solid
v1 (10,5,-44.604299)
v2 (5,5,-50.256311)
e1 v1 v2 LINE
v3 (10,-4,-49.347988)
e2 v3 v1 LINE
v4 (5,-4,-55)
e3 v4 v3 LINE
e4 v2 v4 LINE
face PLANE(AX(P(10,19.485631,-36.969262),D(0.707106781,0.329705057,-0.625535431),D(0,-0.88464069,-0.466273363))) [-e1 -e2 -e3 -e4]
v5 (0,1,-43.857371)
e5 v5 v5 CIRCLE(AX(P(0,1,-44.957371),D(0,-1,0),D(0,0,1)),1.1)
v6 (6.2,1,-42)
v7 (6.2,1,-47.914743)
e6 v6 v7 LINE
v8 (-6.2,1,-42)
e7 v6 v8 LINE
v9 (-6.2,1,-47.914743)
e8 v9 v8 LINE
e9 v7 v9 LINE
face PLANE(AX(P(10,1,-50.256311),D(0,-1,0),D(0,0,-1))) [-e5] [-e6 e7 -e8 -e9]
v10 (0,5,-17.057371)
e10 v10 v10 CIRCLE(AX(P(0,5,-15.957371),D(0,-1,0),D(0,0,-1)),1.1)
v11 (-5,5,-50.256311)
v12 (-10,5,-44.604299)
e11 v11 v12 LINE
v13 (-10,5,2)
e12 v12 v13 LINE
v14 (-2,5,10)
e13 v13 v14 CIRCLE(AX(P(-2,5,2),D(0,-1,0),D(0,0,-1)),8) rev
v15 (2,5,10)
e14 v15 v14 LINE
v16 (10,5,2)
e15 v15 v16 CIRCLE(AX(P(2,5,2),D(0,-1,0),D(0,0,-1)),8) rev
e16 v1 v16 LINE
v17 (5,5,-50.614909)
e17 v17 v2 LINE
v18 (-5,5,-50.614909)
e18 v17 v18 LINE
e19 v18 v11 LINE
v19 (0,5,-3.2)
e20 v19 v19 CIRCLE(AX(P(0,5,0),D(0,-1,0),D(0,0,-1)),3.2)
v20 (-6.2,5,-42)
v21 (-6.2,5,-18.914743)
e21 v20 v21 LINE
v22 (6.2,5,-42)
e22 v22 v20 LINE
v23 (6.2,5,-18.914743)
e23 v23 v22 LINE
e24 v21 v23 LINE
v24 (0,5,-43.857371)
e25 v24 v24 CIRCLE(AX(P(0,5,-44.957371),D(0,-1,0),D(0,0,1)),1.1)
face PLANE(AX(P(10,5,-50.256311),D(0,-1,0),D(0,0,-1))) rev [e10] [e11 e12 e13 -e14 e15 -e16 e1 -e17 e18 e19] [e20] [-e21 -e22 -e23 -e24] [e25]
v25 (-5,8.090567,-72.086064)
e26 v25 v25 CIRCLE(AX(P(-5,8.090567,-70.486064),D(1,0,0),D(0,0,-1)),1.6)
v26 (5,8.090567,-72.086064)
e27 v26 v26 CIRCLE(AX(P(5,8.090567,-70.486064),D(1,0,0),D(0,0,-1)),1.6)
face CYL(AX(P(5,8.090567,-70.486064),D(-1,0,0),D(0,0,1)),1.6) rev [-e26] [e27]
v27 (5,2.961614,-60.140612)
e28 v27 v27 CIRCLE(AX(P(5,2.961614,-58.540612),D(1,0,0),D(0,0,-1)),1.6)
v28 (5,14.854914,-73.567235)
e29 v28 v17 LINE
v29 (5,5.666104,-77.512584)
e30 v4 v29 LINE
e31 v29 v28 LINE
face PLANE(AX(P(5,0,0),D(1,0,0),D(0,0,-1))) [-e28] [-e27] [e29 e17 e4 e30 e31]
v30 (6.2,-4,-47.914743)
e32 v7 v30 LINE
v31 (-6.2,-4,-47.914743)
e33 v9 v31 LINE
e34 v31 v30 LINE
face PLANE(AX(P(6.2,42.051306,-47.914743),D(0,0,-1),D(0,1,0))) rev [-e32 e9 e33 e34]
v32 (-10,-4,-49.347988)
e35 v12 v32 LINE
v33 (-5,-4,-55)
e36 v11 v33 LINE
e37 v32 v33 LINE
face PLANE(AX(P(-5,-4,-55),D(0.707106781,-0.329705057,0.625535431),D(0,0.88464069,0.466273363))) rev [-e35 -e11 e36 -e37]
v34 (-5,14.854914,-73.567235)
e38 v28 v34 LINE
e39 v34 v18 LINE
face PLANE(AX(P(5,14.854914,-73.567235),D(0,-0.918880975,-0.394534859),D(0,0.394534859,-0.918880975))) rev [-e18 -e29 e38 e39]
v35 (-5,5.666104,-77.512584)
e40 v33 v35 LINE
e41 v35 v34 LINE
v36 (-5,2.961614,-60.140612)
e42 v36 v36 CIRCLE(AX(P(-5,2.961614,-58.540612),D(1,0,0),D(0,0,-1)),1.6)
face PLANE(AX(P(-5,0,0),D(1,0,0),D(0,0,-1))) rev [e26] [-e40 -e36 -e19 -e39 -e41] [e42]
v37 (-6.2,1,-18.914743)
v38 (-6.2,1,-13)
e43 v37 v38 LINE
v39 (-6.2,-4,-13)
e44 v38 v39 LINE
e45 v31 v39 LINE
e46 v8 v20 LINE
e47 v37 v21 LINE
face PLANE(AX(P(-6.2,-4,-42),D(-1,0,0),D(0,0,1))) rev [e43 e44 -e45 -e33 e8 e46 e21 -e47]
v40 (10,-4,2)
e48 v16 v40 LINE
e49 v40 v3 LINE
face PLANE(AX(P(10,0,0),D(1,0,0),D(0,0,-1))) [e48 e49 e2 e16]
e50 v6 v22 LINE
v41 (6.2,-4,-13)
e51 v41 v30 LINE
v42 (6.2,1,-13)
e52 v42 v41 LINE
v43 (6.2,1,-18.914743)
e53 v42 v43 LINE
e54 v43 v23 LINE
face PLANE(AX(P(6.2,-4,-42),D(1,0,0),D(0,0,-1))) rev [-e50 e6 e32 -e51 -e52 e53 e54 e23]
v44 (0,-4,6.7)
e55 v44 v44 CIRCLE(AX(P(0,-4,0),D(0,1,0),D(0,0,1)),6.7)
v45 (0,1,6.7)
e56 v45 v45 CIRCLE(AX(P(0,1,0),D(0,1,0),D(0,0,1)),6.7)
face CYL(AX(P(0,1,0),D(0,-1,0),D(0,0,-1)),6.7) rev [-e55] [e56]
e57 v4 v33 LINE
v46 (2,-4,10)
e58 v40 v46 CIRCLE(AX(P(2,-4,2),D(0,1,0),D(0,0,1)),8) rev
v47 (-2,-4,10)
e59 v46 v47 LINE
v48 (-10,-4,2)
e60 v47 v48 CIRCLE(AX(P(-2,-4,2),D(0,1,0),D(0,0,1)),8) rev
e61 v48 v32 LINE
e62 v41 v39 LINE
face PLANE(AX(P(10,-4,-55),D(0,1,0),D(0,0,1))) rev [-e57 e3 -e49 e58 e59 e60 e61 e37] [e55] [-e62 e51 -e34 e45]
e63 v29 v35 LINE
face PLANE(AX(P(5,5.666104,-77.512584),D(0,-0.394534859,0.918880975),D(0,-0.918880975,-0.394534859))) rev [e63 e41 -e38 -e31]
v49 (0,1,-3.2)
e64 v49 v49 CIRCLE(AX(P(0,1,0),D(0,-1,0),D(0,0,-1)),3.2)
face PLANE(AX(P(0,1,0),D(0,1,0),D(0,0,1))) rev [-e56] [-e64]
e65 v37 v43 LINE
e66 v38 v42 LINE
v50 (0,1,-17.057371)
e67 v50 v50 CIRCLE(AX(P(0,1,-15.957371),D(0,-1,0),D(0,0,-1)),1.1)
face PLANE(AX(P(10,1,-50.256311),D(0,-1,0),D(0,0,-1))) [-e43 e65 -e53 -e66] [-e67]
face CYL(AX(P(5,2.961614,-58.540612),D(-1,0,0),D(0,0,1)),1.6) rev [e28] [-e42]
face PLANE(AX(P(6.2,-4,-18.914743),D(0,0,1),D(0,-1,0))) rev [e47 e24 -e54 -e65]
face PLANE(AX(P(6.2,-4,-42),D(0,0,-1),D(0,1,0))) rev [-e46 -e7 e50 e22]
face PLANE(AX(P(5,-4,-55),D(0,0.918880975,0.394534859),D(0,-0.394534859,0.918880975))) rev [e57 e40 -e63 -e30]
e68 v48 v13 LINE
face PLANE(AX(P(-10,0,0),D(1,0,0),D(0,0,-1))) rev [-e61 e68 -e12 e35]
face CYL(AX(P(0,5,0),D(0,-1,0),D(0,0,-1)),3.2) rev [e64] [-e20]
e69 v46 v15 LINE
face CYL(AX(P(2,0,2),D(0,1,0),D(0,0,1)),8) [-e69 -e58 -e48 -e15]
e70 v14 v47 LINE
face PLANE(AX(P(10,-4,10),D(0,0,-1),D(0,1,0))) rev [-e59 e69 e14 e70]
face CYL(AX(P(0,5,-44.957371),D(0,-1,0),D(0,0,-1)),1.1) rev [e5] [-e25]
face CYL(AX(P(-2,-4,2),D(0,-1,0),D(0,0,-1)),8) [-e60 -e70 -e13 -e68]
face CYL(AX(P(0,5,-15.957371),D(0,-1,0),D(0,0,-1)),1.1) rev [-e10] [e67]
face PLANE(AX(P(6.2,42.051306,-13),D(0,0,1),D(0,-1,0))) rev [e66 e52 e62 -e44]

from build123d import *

# Parameters (mm, degrees)
EXTRUDE_1_DEPTH     = 10
SKETCH_2_R          = 6.7
CUT_EXTRUDE_1_DEPTH = 5
SKETCH_4_R          = 3.2
CUT_EXTRUDE_3_DEPTH = 57.124860802
SKETCH_3_W          = 12.4
SKETCH_3_H          = 23.085257288
CUT_EXTRUDE_2_DEPTH = 57.621550668
SKETCH_5_W          = 12.4
SKETCH_5_H          = 34.914742712
CUT_EXTRUDE_4_DEPTH = 5
SKETCH_6_R          = 1.1
CUT_EXTRUDE_5_DEPTH = 57.124860802
FILLET_1_R          = 8
SKETCH_9_R          = 1.6
EXTRUDE_2_DEPTH     = 5
CHAMFER_2_SIZE      = 5


with BuildPart() as part:
    # 草图1 → 凸台-拉伸1 (new, symmetric)
    with BuildSketch(Plane(origin=(0, 0, 0), x_dir=(0, 0, -1), z_dir=(1, 0, 0))):
        Polygon((55, -4), (50.256311045, 5), (-10, 5), (-10, -4), align=None)
    extrude(amount=EXTRUDE_1_DEPTH, both=True)

    # 草图2 → 切除-拉伸1 (cut)
    with BuildSketch(Plane(origin=(0, -4, 0), x_dir=(1, 0, 0), z_dir=(0, 1, 0))):
        with Locations(Location((0, 0, 0), (0, 0, 270))):
            Circle(SKETCH_2_R)
    extrude(amount=CUT_EXTRUDE_1_DEPTH, mode=Mode.SUBTRACT)

    # 草图4 → 切除-拉伸3 (cut, through all)
    with BuildSketch(Plane.XZ.offset(-1)):
        with Locations(Location((0, 0, 0), (0, 0, 270))):
            Circle(SKETCH_4_R)
    extrude(amount=-CUT_EXTRUDE_3_DEPTH, mode=Mode.SUBTRACT)

    # 草图3 → 切除-拉伸2 (cut, through all)
    with BuildSketch(Plane(origin=(0, 5, 0), x_dir=(1, 0, 0), z_dir=(0, 1, 0))):
        with Locations((0, 30.457371356)):
            Rectangle(SKETCH_3_W, SKETCH_3_H)
    extrude(amount=-CUT_EXTRUDE_2_DEPTH, mode=Mode.SUBTRACT)

    # 草图5 → 切除-拉伸4 (cut)
    with BuildSketch(Plane.XZ.offset(4)):
        with Locations((0, -30.457371356)):
            Rectangle(SKETCH_5_W, SKETCH_5_H)
    extrude(amount=-CUT_EXTRUDE_4_DEPTH, mode=Mode.SUBTRACT)

    # 草图6 → 切除-拉伸5 (cut, through all)
    with BuildSketch(Plane.XZ.offset(-1)):
        with Locations(Location((0, -15.957371356, 0), (0, 0, 270))):
            Circle(SKETCH_6_R)
        with Locations(Location((0, -44.957371356, 0), (0, 0, 90))):
            Circle(SKETCH_6_R)
    extrude(amount=-CUT_EXTRUDE_5_DEPTH, mode=Mode.SUBTRACT)

    # 圆角1
    fillet_1_edges = [part.edges().sort_by_distance(p)[0] for p in [
        (10, 0.5, 10),
        (-10, 0.5, 10),
    ]]
    fillet(fillet_1_edges, radius=FILLET_1_R)

    # 草图9 → 凸台-拉伸2 (add, symmetric)
    with BuildSketch(Plane(origin=(0, 0, 0), x_dir=(0, 0, -1), z_dir=(1, 0, 0))):
        Polygon((55, -4), (77.512583876, 5.666104035), (73.567235291, 14.85491378), (50.614909072, 5), (50.256311045, 5), align=None)
        with Locations((70.486064224, 8.090567185)):
            Circle(SKETCH_9_R, mode=Mode.SUBTRACT)
        with Locations((58.540611554, 2.961614024)):
            Circle(SKETCH_9_R, mode=Mode.SUBTRACT)
    extrude(amount=EXTRUDE_2_DEPTH, both=True)

    # 倒角2
    chamfer_2_edges = [part.edges().sort_by_distance(p)[0] for p in [
        (-10, 0.5, -52.628155522),
        (10, 0.5, -52.628155522),
    ]]
    chamfer(chamfer_2_edges, length=CHAMFER_2_SIZE - 0.0001)  # a hair under: the kernel refuses the full size


solid = part.part
